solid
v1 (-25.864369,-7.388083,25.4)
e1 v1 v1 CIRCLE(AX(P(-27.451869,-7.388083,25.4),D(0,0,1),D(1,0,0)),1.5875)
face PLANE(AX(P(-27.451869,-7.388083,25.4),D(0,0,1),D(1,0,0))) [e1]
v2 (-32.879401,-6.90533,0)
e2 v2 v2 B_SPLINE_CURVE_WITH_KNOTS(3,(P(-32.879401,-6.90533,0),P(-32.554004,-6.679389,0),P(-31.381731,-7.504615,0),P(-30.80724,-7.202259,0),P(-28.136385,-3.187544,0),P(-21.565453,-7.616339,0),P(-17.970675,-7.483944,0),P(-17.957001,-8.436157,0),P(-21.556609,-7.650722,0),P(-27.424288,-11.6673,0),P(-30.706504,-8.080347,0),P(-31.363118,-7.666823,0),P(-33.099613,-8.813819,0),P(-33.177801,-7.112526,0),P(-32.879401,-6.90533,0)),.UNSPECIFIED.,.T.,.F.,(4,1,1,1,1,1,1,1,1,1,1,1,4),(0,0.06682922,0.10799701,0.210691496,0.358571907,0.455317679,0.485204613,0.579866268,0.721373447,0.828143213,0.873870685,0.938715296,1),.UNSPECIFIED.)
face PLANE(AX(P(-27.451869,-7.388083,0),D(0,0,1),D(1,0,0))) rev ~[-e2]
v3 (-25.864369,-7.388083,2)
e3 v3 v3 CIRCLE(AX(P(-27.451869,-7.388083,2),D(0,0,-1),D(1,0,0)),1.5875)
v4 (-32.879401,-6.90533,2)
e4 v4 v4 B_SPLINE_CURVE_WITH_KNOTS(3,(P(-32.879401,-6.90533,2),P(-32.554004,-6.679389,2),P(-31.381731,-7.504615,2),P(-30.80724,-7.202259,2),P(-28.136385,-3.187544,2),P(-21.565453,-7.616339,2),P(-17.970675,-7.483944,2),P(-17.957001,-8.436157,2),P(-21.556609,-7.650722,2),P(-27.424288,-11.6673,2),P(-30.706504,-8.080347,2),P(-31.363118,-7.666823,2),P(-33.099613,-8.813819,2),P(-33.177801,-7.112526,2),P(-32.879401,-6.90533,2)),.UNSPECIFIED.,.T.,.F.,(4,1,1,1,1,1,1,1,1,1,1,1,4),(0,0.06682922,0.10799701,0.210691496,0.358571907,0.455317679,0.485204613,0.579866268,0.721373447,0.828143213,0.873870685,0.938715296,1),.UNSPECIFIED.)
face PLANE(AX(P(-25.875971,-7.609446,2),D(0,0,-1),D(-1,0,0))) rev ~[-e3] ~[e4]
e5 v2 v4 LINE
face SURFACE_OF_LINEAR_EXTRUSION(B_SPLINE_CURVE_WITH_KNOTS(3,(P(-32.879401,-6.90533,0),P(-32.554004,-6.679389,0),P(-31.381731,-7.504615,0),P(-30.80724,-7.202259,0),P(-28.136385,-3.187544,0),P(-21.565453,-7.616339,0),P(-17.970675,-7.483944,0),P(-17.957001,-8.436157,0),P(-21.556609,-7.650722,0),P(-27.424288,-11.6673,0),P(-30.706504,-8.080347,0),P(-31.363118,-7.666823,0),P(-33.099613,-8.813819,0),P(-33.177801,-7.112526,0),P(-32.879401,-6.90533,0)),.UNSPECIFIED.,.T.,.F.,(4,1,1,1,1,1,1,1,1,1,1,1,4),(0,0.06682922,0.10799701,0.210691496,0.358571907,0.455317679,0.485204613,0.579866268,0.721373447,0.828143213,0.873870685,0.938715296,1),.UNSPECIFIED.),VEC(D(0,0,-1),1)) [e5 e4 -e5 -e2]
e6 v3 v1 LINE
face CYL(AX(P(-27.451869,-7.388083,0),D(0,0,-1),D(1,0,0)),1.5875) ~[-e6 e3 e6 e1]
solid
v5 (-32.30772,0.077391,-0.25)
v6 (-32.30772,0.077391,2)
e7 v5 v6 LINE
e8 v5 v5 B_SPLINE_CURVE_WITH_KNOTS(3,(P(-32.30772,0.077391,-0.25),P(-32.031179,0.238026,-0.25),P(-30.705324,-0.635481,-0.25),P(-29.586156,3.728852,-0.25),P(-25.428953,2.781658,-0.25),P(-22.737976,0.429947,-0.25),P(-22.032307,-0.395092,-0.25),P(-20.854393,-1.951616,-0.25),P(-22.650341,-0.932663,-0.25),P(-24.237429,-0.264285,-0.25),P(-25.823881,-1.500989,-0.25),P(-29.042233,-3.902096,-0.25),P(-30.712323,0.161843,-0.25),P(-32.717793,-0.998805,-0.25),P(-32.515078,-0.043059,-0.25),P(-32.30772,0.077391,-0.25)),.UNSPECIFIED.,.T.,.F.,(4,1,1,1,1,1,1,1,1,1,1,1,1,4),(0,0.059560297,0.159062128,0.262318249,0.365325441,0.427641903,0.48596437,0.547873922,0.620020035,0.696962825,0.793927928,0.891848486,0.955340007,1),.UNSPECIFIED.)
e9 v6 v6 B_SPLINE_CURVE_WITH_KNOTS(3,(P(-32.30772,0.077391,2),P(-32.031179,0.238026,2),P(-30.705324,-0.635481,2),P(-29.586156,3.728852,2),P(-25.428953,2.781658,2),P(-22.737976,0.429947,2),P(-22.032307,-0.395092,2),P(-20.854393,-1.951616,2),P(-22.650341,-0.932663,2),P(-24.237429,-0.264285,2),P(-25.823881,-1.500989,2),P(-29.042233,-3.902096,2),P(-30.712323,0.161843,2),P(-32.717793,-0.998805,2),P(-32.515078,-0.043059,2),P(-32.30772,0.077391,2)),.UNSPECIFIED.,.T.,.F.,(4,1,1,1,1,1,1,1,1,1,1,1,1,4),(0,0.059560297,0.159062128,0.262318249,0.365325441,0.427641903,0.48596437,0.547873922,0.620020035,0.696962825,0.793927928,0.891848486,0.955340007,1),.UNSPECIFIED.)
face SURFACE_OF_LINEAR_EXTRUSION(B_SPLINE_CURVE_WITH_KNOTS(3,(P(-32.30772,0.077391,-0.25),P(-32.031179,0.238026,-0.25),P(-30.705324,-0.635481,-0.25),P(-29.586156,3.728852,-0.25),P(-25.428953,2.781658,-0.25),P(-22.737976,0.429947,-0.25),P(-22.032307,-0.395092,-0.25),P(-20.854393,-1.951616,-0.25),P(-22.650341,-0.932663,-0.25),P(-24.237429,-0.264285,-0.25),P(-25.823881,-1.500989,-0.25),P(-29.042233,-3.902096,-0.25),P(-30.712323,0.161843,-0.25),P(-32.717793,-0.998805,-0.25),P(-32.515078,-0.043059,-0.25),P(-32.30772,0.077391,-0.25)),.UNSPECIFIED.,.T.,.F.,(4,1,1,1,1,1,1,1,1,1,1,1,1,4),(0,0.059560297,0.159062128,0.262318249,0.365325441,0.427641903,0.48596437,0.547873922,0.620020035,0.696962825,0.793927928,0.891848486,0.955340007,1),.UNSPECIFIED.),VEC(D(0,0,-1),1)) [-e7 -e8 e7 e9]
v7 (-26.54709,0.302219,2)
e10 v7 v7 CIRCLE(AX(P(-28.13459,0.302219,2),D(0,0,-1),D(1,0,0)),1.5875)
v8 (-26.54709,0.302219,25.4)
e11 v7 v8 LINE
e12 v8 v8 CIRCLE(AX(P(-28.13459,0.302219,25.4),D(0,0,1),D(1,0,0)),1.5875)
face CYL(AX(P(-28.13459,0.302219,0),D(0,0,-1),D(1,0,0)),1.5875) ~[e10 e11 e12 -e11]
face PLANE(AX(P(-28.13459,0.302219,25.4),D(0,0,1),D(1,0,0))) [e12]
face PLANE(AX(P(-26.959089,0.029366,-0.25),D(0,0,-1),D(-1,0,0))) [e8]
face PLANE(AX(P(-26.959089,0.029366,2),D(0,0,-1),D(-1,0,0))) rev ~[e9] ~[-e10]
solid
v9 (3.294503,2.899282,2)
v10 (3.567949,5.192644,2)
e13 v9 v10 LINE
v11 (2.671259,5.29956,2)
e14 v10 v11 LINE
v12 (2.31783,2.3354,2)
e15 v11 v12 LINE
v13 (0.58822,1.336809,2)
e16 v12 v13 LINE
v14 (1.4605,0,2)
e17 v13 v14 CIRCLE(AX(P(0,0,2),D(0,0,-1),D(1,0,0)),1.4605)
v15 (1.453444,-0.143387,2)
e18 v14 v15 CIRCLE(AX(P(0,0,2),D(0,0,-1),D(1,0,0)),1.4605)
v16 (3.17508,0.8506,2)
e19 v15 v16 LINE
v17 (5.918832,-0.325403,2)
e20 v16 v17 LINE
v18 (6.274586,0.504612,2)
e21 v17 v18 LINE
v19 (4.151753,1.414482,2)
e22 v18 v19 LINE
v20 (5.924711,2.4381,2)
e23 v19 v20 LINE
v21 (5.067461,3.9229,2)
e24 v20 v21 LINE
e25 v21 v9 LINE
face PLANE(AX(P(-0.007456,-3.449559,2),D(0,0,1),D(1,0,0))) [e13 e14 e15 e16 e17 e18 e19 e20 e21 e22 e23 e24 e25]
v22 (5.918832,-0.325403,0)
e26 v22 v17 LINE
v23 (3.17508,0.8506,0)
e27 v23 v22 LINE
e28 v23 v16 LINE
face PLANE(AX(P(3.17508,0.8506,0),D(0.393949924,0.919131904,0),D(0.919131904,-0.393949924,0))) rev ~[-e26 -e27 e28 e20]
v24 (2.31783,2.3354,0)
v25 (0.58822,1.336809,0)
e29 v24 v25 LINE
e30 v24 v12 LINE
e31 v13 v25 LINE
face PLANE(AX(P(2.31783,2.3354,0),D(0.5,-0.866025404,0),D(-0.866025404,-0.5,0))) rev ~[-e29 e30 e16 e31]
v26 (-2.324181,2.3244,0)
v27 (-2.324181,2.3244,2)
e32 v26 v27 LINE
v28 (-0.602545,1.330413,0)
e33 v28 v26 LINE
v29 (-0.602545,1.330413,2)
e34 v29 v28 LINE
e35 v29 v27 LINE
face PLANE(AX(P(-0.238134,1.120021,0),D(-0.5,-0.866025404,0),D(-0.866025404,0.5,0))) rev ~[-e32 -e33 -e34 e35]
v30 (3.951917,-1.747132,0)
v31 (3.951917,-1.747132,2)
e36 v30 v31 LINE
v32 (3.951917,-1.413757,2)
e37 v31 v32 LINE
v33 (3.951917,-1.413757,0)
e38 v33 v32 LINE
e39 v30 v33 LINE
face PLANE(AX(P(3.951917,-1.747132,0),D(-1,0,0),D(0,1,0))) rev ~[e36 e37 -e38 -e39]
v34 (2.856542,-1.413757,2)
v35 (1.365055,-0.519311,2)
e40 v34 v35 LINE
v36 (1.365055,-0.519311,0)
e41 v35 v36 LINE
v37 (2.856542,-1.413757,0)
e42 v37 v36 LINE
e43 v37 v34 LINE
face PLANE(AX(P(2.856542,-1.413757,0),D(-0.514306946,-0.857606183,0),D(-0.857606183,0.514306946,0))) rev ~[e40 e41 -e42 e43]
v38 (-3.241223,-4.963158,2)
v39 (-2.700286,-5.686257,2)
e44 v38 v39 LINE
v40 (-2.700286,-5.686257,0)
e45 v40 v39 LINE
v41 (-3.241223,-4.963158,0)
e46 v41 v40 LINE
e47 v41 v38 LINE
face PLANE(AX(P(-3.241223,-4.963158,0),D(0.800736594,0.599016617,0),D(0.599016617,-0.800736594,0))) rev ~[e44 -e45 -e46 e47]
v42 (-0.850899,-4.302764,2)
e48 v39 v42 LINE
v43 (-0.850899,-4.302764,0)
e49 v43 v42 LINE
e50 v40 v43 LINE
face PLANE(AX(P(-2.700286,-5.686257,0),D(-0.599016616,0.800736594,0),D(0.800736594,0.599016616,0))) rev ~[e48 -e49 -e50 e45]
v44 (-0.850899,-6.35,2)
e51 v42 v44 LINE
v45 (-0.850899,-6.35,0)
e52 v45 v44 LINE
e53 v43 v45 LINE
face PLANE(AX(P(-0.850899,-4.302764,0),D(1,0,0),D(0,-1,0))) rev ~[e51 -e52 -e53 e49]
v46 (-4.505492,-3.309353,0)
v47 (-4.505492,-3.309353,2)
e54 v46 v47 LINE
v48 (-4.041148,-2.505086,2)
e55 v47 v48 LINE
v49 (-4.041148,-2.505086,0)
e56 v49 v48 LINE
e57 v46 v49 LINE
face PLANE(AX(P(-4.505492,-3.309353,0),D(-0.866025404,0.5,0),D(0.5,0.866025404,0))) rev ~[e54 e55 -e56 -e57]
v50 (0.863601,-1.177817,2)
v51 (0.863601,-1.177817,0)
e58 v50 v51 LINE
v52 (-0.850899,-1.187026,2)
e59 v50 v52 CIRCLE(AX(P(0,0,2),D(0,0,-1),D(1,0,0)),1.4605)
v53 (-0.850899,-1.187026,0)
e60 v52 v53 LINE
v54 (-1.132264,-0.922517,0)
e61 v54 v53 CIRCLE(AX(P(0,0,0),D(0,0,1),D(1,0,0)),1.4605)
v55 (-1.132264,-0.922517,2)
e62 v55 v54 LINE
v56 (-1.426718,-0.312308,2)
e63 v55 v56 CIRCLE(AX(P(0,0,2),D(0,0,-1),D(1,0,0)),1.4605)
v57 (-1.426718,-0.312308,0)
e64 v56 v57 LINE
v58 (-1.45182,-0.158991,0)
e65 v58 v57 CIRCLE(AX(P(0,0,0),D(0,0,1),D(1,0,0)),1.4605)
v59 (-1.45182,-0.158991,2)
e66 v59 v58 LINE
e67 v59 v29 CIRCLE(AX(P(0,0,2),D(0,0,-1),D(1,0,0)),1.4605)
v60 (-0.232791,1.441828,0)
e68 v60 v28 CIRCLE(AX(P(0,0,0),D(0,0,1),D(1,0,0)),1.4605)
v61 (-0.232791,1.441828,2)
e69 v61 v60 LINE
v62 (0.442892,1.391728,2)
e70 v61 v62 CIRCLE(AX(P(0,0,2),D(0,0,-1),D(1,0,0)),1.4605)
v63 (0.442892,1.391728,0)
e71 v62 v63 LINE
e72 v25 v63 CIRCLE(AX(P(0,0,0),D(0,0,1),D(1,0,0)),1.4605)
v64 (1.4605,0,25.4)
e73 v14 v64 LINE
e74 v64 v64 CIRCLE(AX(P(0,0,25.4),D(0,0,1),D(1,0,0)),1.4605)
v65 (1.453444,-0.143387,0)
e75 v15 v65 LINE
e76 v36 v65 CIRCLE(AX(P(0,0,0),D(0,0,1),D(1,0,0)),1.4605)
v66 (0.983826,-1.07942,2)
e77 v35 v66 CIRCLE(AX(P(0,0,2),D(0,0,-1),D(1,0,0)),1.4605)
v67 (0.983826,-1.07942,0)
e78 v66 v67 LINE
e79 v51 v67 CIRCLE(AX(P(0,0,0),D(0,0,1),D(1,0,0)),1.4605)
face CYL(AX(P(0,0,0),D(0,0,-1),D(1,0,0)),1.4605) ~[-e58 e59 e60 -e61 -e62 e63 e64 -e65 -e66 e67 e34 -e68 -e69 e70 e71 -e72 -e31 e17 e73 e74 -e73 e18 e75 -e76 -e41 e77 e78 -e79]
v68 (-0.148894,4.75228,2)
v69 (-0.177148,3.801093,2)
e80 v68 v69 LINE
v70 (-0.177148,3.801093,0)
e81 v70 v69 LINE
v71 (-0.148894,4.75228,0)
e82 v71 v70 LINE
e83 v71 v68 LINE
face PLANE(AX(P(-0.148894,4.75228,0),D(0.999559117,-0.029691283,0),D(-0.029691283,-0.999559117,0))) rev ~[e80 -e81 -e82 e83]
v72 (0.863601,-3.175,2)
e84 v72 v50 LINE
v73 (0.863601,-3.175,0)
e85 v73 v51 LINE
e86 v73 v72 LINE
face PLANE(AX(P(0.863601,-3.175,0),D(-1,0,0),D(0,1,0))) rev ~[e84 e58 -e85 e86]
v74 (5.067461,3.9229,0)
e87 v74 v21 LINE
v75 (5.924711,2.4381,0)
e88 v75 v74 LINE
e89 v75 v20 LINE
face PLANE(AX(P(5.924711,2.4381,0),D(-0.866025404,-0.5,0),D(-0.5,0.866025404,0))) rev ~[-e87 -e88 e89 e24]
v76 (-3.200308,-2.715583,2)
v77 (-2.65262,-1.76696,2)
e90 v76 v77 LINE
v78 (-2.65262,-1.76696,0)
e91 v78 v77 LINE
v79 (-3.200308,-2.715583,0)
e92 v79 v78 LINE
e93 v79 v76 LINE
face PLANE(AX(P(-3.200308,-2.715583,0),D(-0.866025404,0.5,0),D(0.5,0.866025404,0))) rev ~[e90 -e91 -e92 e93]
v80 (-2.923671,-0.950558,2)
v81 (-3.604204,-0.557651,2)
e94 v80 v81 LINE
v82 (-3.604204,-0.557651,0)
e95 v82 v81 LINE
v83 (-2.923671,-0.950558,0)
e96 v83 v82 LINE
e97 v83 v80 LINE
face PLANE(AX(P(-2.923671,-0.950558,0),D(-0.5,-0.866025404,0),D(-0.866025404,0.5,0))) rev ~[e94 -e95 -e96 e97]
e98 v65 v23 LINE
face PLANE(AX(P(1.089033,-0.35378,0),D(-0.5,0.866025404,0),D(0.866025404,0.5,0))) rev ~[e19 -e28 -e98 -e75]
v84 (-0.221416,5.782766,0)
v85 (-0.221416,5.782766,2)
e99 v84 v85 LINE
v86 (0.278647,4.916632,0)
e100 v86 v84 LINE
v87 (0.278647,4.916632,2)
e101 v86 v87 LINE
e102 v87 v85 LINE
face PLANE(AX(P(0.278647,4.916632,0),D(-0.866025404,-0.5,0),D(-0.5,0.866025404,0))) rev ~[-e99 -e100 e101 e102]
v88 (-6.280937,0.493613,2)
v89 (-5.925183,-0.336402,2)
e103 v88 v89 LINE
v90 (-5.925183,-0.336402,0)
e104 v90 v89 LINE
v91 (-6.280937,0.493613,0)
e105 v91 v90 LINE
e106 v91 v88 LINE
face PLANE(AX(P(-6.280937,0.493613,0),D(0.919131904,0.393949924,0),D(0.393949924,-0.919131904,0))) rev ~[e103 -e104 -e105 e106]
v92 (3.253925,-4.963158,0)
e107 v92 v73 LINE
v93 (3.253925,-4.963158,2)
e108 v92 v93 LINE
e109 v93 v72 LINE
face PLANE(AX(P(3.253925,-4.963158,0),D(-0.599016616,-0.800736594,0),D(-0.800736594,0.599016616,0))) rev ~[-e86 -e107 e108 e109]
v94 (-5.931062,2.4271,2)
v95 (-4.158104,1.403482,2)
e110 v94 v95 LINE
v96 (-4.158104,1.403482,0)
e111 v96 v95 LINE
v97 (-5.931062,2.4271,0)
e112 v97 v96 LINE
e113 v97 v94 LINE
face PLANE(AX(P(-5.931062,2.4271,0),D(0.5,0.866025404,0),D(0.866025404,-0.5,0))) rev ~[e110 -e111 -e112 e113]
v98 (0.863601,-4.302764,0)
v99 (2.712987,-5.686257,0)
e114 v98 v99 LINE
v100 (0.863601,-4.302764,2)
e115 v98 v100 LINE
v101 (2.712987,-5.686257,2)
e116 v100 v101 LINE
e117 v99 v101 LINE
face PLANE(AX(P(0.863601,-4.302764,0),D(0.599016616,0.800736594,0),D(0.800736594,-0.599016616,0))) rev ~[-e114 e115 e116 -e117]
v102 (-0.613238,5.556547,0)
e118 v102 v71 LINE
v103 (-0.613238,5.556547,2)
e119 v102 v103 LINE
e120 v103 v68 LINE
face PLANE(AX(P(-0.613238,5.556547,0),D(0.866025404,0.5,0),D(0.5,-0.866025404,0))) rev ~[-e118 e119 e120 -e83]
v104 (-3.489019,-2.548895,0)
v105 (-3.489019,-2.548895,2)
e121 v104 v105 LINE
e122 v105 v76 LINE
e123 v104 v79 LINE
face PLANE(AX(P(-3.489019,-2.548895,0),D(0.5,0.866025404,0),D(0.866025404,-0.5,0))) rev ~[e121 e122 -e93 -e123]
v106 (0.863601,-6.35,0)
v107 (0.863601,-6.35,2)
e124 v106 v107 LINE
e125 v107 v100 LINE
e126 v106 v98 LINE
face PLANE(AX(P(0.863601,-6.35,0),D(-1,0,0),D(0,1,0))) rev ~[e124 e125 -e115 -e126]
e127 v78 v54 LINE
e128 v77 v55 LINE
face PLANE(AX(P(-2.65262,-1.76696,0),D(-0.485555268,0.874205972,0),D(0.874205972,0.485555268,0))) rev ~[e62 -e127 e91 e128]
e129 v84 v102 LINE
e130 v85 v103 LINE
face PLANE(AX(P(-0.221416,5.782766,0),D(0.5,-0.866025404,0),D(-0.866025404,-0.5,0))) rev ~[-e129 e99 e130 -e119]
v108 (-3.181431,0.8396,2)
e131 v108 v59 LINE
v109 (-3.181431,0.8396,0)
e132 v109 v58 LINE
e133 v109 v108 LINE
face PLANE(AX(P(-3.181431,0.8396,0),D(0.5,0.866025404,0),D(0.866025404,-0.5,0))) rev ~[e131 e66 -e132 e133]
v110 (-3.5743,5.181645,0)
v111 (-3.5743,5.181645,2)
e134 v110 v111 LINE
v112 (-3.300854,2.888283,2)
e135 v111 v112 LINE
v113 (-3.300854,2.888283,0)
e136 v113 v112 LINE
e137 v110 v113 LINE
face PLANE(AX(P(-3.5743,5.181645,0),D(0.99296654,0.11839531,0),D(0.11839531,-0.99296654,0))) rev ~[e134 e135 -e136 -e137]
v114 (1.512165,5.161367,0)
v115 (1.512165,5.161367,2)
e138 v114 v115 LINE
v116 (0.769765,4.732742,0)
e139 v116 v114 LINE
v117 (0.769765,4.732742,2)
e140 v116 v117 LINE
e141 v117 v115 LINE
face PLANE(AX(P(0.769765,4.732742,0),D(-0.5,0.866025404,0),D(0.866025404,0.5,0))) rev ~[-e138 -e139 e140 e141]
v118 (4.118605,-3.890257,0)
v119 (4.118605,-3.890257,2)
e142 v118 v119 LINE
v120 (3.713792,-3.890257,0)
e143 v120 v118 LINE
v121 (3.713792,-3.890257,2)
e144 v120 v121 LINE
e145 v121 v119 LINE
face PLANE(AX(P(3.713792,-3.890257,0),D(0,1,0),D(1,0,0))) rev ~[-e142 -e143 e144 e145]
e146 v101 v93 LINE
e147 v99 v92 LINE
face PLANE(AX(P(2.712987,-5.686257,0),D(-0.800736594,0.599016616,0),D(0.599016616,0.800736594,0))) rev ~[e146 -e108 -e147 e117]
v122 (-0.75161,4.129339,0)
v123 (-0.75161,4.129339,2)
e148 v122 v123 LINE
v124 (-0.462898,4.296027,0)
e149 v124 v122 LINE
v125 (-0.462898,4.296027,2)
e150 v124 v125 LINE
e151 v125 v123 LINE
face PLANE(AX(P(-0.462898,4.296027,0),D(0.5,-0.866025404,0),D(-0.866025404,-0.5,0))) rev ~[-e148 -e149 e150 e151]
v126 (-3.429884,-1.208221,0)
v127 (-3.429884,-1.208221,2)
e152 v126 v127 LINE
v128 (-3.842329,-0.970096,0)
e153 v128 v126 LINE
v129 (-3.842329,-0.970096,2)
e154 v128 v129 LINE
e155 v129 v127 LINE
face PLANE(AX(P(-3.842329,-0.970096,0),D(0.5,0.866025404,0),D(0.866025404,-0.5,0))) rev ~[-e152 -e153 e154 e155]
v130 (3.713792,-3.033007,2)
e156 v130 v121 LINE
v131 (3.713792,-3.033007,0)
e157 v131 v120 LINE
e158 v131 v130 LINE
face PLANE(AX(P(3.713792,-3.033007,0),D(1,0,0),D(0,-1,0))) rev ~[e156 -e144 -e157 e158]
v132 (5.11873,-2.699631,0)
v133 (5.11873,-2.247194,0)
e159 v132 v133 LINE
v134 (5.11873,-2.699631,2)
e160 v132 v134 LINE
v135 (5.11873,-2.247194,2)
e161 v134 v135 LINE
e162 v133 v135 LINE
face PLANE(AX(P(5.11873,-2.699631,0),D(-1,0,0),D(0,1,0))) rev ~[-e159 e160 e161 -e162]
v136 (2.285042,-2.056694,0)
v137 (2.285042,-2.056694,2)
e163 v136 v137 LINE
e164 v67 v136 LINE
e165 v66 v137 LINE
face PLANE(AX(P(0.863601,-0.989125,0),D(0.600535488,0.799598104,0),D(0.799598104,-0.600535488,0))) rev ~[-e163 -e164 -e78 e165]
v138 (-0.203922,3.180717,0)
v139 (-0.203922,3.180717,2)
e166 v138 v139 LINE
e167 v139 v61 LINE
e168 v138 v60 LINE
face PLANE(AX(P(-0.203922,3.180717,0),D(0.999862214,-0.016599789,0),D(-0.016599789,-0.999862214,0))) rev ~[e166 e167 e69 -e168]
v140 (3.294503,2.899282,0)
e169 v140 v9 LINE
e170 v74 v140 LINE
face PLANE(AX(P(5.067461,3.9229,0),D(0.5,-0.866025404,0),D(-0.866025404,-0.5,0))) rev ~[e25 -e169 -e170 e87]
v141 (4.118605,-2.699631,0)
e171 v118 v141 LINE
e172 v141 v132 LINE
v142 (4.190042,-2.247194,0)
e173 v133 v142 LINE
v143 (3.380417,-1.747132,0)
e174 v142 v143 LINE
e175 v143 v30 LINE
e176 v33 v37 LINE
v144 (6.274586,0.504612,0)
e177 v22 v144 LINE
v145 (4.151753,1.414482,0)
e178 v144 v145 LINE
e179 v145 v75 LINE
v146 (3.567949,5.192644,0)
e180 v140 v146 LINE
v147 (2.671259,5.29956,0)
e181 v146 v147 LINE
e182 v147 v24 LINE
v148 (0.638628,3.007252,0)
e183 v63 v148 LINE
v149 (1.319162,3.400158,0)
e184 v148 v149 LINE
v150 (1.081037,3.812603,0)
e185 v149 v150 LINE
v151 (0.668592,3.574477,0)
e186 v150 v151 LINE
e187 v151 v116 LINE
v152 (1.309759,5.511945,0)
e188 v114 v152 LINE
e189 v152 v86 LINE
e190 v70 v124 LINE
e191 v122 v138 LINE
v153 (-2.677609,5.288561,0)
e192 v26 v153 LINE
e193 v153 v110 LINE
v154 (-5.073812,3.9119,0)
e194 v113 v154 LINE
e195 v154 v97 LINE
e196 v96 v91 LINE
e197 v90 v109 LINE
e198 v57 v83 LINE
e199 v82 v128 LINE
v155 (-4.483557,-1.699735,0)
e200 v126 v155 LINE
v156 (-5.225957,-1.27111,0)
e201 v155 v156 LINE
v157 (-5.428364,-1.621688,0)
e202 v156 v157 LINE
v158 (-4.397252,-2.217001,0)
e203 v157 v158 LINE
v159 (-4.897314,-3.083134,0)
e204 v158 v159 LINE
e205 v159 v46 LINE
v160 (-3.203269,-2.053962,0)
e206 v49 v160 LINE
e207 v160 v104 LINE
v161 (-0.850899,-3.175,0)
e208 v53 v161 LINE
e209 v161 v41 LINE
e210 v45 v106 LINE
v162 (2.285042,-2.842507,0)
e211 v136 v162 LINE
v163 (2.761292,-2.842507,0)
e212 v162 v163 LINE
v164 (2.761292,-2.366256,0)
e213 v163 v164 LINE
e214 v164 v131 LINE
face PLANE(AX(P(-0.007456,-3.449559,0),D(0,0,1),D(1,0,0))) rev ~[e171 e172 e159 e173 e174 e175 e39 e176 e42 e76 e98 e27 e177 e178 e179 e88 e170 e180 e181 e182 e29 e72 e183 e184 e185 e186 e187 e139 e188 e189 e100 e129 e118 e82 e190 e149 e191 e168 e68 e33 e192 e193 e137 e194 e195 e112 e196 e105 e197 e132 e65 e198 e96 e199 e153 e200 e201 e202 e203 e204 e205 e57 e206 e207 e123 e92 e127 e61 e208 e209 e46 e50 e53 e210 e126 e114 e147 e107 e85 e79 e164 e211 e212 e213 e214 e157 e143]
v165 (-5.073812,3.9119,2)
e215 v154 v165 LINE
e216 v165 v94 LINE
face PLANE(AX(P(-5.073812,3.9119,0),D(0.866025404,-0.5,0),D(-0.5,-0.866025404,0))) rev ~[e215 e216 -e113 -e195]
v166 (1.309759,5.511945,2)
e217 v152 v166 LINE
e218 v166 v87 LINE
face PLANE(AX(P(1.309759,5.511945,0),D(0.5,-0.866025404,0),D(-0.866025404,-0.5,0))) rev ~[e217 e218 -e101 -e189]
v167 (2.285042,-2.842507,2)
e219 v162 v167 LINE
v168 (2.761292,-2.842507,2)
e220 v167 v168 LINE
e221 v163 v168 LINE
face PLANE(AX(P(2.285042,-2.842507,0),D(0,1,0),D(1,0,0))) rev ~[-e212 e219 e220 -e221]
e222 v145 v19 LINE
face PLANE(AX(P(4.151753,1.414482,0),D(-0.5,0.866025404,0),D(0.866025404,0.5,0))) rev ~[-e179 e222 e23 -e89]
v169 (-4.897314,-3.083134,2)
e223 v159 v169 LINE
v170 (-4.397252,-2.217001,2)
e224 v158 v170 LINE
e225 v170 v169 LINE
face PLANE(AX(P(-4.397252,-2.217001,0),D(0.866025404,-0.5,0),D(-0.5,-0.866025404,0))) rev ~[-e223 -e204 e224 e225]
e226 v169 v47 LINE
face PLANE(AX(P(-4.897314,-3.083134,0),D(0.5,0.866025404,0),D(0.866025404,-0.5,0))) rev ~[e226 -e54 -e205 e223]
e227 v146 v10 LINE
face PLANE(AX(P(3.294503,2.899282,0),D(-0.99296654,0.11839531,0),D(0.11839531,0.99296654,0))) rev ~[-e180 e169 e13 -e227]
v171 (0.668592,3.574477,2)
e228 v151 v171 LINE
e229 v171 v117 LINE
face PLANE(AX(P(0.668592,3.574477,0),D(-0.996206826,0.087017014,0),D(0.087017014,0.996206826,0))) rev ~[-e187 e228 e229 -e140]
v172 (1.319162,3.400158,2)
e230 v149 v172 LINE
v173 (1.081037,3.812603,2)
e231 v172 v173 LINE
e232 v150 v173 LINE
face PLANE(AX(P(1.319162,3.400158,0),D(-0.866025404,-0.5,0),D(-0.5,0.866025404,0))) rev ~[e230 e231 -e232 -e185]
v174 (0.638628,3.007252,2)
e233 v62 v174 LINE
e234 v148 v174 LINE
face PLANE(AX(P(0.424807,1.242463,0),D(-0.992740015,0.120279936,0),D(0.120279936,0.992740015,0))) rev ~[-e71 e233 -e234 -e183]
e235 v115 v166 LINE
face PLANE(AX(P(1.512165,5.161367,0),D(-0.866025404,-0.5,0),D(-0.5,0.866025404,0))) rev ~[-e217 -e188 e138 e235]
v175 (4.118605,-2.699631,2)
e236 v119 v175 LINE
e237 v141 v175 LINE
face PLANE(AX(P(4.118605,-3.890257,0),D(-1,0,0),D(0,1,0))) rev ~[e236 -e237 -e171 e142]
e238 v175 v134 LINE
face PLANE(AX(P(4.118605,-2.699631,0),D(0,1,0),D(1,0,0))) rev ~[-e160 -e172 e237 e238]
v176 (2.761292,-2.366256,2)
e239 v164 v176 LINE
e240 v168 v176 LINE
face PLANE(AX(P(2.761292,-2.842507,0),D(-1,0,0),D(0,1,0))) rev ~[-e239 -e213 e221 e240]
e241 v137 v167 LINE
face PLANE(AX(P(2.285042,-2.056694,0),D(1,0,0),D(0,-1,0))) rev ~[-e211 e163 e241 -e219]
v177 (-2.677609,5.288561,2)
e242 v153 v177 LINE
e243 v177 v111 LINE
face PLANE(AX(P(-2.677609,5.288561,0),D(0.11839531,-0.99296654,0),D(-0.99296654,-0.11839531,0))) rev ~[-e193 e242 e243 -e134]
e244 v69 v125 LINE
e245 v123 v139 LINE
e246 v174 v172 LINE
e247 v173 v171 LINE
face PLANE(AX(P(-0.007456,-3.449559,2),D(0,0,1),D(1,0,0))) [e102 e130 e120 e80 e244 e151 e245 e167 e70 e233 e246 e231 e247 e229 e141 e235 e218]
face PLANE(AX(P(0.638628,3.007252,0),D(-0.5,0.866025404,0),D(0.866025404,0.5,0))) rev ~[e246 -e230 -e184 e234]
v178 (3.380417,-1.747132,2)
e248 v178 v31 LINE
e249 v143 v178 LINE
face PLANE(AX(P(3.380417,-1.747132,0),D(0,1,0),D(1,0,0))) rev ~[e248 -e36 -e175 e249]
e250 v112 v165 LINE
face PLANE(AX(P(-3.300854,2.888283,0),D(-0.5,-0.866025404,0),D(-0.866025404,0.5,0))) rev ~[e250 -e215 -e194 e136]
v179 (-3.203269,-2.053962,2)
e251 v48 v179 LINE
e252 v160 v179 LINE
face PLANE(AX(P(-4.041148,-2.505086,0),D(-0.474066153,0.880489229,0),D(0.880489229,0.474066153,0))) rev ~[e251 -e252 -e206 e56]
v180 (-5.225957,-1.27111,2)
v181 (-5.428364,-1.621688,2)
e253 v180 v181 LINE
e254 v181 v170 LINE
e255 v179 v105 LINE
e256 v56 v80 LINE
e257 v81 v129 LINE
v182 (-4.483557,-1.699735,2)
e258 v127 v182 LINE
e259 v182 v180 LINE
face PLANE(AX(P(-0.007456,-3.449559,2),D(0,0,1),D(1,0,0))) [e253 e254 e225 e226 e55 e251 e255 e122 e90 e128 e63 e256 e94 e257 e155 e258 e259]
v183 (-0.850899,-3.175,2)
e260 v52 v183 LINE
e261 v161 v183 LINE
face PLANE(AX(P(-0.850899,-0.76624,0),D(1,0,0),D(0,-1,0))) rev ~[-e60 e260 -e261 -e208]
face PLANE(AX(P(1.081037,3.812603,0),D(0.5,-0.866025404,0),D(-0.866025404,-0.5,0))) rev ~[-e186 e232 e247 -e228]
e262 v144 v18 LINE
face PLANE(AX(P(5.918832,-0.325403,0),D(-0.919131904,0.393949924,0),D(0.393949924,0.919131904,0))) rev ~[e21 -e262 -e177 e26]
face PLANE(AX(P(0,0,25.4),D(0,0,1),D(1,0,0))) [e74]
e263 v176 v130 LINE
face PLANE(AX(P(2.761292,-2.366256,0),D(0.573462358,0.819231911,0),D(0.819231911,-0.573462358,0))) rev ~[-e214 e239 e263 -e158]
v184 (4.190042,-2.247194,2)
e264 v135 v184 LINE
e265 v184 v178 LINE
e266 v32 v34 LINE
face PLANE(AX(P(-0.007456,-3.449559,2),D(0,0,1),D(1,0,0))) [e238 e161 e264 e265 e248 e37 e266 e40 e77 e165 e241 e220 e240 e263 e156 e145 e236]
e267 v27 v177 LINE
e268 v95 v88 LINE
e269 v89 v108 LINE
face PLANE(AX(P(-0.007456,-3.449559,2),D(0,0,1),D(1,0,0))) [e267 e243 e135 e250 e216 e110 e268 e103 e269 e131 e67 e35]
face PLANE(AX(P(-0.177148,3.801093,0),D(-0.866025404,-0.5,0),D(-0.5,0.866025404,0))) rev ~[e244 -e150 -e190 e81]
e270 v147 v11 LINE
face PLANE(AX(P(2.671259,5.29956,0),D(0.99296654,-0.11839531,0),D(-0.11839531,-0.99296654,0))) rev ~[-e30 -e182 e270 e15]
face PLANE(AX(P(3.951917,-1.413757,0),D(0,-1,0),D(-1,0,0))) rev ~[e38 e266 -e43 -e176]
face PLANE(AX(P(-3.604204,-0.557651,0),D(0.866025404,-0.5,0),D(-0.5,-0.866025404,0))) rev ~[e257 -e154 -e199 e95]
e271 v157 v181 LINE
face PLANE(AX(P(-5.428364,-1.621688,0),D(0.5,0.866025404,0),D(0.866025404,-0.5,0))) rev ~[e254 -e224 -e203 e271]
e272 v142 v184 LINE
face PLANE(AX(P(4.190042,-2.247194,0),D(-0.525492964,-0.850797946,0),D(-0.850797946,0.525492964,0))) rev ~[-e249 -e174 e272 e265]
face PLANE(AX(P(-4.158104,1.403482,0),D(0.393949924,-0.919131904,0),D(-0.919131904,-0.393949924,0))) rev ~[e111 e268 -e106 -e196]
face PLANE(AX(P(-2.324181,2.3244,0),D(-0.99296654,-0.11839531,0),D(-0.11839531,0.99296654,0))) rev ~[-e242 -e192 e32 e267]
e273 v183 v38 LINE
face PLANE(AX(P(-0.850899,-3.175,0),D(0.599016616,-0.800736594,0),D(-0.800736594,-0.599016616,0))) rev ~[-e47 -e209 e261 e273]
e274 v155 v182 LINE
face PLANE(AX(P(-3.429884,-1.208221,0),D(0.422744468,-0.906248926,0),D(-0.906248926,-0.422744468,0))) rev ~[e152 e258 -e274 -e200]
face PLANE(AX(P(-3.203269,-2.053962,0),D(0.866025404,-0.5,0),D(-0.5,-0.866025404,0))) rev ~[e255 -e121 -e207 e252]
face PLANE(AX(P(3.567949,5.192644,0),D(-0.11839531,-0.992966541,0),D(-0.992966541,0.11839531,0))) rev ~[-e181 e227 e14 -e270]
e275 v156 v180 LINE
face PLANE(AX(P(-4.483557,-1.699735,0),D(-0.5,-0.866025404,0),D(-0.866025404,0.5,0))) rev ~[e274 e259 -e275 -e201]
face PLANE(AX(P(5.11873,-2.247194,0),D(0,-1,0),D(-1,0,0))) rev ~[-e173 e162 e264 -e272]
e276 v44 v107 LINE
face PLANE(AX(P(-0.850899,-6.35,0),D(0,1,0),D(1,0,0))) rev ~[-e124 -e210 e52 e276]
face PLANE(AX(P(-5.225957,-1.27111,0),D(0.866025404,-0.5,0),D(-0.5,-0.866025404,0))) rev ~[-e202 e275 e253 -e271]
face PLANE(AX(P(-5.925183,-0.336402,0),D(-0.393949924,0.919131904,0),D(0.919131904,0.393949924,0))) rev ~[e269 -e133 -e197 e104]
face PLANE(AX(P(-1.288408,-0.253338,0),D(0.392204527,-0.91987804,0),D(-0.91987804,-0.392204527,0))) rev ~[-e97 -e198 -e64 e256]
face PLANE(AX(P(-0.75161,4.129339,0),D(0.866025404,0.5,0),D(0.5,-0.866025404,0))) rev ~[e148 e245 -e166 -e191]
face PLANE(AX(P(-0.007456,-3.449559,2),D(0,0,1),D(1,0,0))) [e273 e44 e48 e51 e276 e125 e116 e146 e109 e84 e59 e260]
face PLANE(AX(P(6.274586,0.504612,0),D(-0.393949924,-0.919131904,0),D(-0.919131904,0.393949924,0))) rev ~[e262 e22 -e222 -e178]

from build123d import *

# Parameters (mm, degrees)
F2_DEPTH  = 2
F1_R      = 1.4605
F3_DEPTH  = 25.4
F5_DEPTH  = 1
F7_SCALE  = 2.25
F9_R      = 1.5875
F10_DEPTH = 25.4
F13_DEPTH = 2
F12_R     = 1.5875
F14_DEPTH = 25.4


# Not quite as in the source:
# - ends of sketch curves that miss each other by under 0.0002 mm in the source are joined
# - a feature names something its author has since deleted; it is built from what else it names


with BuildPart() as f2:
    # F0 (on Top) → F2 (new body)
    with BuildSketch(Plane.XY):
        Polygon((0.3471141813, -0.6012196677), (-0.1371353539, -0.2375256701), (-0.2495522491, -0.4322374442), (-0.4318002417, -0.747900227), (-0.6211034032, -0.6386059958), (-0.8508992831, -0.7662402189), (-0.8508992831, -3.1749998652), (-0.8508992831, -4.3027643429), (-0.8508992831, -6.3499998652), (0.8636007169, -6.3499998652), (0.8636007169, -4.3027643429), (0.8636007169, -3.1749998652), (0.8636007169, -0.9891251569), (0.483299174, -0.703500952), (0.4254495248, -0.7369004626), align=None)
        Polygon((-0.8508992831, -4.3027643429), (-0.8508992831, -3.1749998652), (-3.2412230885, -4.9631580294), (-2.7002857532, -5.6862570345), align=None)
        Polygon((3.2539245223, -4.9631580294), (0.8636007169, -3.1749998652), (0.8636007169, -4.3027643429), (2.7129871871, -5.6862570345), align=None)
        Polygon((-0.8508992831, -0.0667988863), (-0.6942285962, 1.348e-07), (-0.8508992831, 1.348e-07), align=None)
        Polygon((-0.6942285962, 1.348e-07), (-0.1371355874, 0.2375255353), (-0.2495524826, 0.4322373094), (-0.4318004752, 0.7479000922), (-0.2424973138, 0.8571943234), (-0.2381338534, 1.1200205046), (-2.3241808987, 2.3244003278), (-3.3008535859, 2.8882825667), (-5.0738115558, 3.9119003278), (-5.9310615558, 2.427099773), (-4.1581035859, 1.4034820119), (-3.1814308987, 0.839599773), (-1.2884078719, -0.2533375811), (-0.8508992831, -0.0667988863), (-0.8508992831, 1.348e-07), align=None)
        Polygon((-0.8508992831, -0.7662402189), (-0.8508992831, -0.5059332827), (-1.2884078719, -0.2533375811), (-2.9236705151, -0.950557629), (-3.6042041051, -0.5576513776), (-3.8423290847, -0.9700959409), (-3.4298843198, -1.208221037), (-4.4835569455, -1.6997353006), (-5.2259572804, -1.2711102674), (-5.4283635946, -1.6216882874), (-4.3972519847, -2.2170008529), (-4.8973144653, -3.0831344762), (-4.5054921503, -3.3093531953), (-4.0411482187, -2.5050859137), (-3.2032690115, -2.0539615173), (-3.4890190337, -2.5488950739), (-3.2003078595, -2.7155825481), (-2.6526203364, -1.7669599314), align=None)
        Polygon((-5.9251831976, -0.3364022836), (-3.1814308987, 0.839599773), (-4.1581035859, 1.4034820119), (-6.2809366379, 0.4936126931), align=None)
        Polygon((-3.3008535859, 2.8882825667), (-2.3241808987, 2.3244003278), (-2.6776093922, 5.2885605486), (-3.5743001677, 5.181644577), align=None)
        Polygon((-0.0127014339, 0.9898670365), (0.4248071549, 1.242462738), (0.6386282031, 3.0072517529), (1.3191617931, 3.4001580042), (1.0810368134, 3.8126025675), (0.6685920485, 3.5744774715), (0.7697645227, 4.7327418644), (1.5121648577, 5.1613668976), (1.3097585434, 5.5119449176), (0.2786469335, 4.916632352), (-0.2214155471, 5.7827659754), (-0.6132378621, 5.5565472563), (-0.1488939305, 4.7522799747), (-0.1771483466, 3.8010930978), (-0.4628983688, 4.2960266544), (-0.7516095429, 4.1293391803), (-0.2039220199, 3.1807165637), (-0.2381338534, 1.1200205046), align=None)
        Polygon((2.6712586753, 5.299560313), (2.3178301818, 2.3354000922), (3.294502869, 2.8992823311), (3.5679494508, 5.1926443415), align=None)
        Polygon((0.2742709413, 1.348e-07), (0.4991047317, 1.348e-07), (0.8636007169, 1.348e-07), (0.8636007169, -0.2185883276), (1.0890331365, -0.3537802858), (3.1750801818, 0.8505995374), (4.151752869, 1.4144817763), (5.9247108388, 2.4380995374), (5.0674608388, 3.9229000922), (3.294502869, 2.8992823311), (2.3178301818, 2.3354000922), (0.4248071549, 1.242462738), (0.3676001091, 0.7702998383), (0.4254497583, 0.7369003278), (0.3471144148, 0.6012195329), align=None)
        Polygon((4.151752869, 1.4144817763), (3.1750801818, 0.8505995374), (5.9188324807, -0.3254025192), (6.274585921, 0.5046124575), align=None)
        Polygon((1.0890331365, -0.3537802858), (0.8636007169, -0.4839337539), (0.8636007169, -0.9891251569), (2.285042312, -2.0566941239), (2.285042312, -2.8425066266), (2.7612922713, -2.8425066266), (2.7612922713, -2.3662564345), (3.7137924228, -3.0330065638), (3.7137924228, -3.8902566303), (4.1186050512, -3.8902566303), (4.1186050512, -2.6996314991), (5.1187300123, -2.6996314991), (5.1187300123, -2.2471940611), (4.1900421493, -2.2471940611), (3.3804173581, -1.7471315805), (3.9519174024, -1.7471315805), (3.9519174024, -1.4137566322), (2.8565423563, -1.4137566322), align=None)
        Polygon((0.8636007169, -0.2185883276), (0.4991047317, 1.348e-07), (0.2742709413, 1.348e-07), (0.2266974185, -0.3926517164), (0.3471141813, -0.6012196677), (0.483299174, -0.703500952), (0.8636007169, -0.4839337539), align=None)
        Polygon((-0.1371353539, -0.2375256701), (-0.4533950705, 1.348e-07), (-0.6942285962, 1.348e-07), (-0.8508992831, -0.0667988863), (-0.8508992831, -0.5059332827), (-0.6211034032, -0.6386059958), (-0.2495522491, -0.4322374442), align=None)
        Polygon((0.226697652, 0.3926515816), (0.3471144148, 0.6012195329), (0.3676001091, 0.7702998383), (-0.0127014339, 0.9898670365), (-0.2424973138, 0.8571943234), (-0.2495524826, 0.4322373094), (-0.1371355874, 0.2375255353), align=None)
        Polygon((-0.0127014339, 0.9898670365), (0.3676001091, 0.7702998383), (0.4248071549, 1.242462738), align=None)
        Polygon((1.0890331365, -0.3537802858), (0.8636007169, -0.2185883276), (0.8636007169, -0.4839337539), align=None)
        Polygon((-0.4318002417, -0.747900227), (-0.2495522491, -0.4322374442), (-0.6211034032, -0.6386059958), align=None)
        Polygon((-0.8508992831, -0.7662402189), (-0.6211034032, -0.6386059958), (-0.8508992831, -0.5059332827), align=None)
        Polygon((-0.4318004752, 0.7479000922), (-0.2495524826, 0.4322373094), (-0.2424973138, 0.8571943234), align=None)
        Polygon((-0.2424973138, 0.8571943234), (-0.0127014339, 0.9898670365), (-0.2381338534, 1.1200205046), align=None)
        Polygon((0, 1.348e-07), (0.2742709413, 1.348e-07), (0.3471144148, 0.6012195329), (0.226697652, 0.3926515816), align=None)
        Polygon((-0.1371355874, 0.2375255353), (-1.167e-07, -6.74e-08), (0.226697652, 0.3926515816), align=None)
        Polygon((-0.4533950705, 1.348e-07), (0, 1.348e-07), (-0.1371355874, 0.2375255353), (-0.6942285962, 1.348e-07), align=None)
        Polygon((-0.1371353539, -0.2375256701), (1.167e-07, -6.74e-08), (-0.4533950705, 1.348e-07), align=None)
        Polygon((0.2266974185, -0.3926517164), (-1.167e-07, -6.74e-08), (-0.1371353539, -0.2375256701), (0.3471141813, -0.6012196677), align=None)
        Polygon((0.2266974185, -0.3926517164), (0.2742709413, 1.348e-07), (0, 1.348e-07), align=None)
        Polygon((0.3676001091, 0.7702998383), (0.3471144148, 0.6012195329), (0.4254497583, 0.7369003278), align=None)
        Polygon((0.483299174, -0.703500952), (0.3471141813, -0.6012196677), (0.4254495248, -0.7369004626), align=None)
    extrude(amount=F2_DEPTH)

    # F1 (on Top) → F3 (join)
    with BuildSketch(Plane.XY):
        Circle(F1_R)
    extrude(amount=F3_DEPTH)


with BuildPart() as f5:
    # F4 (on Top) → F5 (new body)
    with BuildSketch(Plane.XY):
        with BuildLine():
            add(Edge.make_bspline(
                [(-29.8669375479, 0.2857499931), (-29.7440304745, 0.3571436979), (-29.1547614666, -0.031081706), (-28.6573535606, 1.9086215428), (-26.8097076406, 1.4876465764), (-25.6137182394, 0.4424417951), (-25.3000873709, 0.0757578444), (-24.7765698555, -0.6160305024), (-25.5747691832, -0.1631625611), (-26.2801418295, 0.1338939544), (-26.9852315195, -0.4157522042), (-28.4156101147, -1.4829106615), (-29.1578723902, 0.3232844338), (-30.049192476, -0.1925589818), (-29.9590967439, 0.2322169762), (-29.8669375479, 0.2857499931)],
                knots=[0, 0, 0, 0, 0.0595602967, 0.1590621278, 0.2623182491, 0.3653254409, 0.4276419031, 0.4859643703, 0.5478739218, 0.6200200353, 0.696962825, 0.7939279281, 0.8918484857, 0.9553400069, 1, 1, 1, 1], degree=3))
        make_face()
    extrude(amount=F5_DEPTH)


with BuildPart() as f5_1:
    # F7: moved
    add(f5.part.scale(F7_SCALE).moved(Location((34.892889671, -0.5655468703, -1.25))))


with BuildPart() as f5_2:
    # F8: moved
    add(f5_1.part.moved(Location((0, 0, 1))))

    # F9 (on Top) → F10 (join)
    with BuildSketch(Plane.XY):
        with Locations((-28.1345900148, 0.302218803)):
            Circle(F9_R)
    extrude(amount=F10_DEPTH)


with BuildPart() as f13:
    # F11 (on Top) → F13 (new body)
    with BuildSketch(Plane.XY):
        with BuildLine():
            add(Edge.make_bspline(
                [(-32.8794009984, -6.9053298794), (-32.5540037989, -6.6793889467), (-31.3817308567, -7.5046151757), (-30.8072401032, -7.2022586946), (-28.1363850092, -3.1875440328), (-21.5654529107, -7.6163391855), (-17.9706751628, -7.4839443562), (-17.9570012573, -8.4361565431), (-21.5566094546, -7.6507221771), (-27.4242880142, -11.6673001261), (-30.7065035244, -8.0803469893), (-31.3631183292, -7.6668234126), (-33.0996125613, -8.8138189541), (-33.1778014741, -7.1125255219), (-32.8794009984, -6.9053298794)],
                knots=[0, 0, 0, 0, 0.0668292197, 0.1079970099, 0.2106914958, 0.3585719071, 0.4553176788, 0.4852046131, 0.5798662681, 0.721373447, 0.8281432135, 0.8738706847, 0.9387152963, 1, 1, 1, 1], degree=3))
        make_face()
    extrude(amount=F13_DEPTH)

    # F12 (on Top) → F14 (join)
    with BuildSketch(Plane.XY):
        with Locations((-27.4518691003, -7.3880827986)):
            Circle(F12_R)
    extrude(amount=F14_DEPTH)


solid = Compound([f2.part, f5_2.part, f13.part])
